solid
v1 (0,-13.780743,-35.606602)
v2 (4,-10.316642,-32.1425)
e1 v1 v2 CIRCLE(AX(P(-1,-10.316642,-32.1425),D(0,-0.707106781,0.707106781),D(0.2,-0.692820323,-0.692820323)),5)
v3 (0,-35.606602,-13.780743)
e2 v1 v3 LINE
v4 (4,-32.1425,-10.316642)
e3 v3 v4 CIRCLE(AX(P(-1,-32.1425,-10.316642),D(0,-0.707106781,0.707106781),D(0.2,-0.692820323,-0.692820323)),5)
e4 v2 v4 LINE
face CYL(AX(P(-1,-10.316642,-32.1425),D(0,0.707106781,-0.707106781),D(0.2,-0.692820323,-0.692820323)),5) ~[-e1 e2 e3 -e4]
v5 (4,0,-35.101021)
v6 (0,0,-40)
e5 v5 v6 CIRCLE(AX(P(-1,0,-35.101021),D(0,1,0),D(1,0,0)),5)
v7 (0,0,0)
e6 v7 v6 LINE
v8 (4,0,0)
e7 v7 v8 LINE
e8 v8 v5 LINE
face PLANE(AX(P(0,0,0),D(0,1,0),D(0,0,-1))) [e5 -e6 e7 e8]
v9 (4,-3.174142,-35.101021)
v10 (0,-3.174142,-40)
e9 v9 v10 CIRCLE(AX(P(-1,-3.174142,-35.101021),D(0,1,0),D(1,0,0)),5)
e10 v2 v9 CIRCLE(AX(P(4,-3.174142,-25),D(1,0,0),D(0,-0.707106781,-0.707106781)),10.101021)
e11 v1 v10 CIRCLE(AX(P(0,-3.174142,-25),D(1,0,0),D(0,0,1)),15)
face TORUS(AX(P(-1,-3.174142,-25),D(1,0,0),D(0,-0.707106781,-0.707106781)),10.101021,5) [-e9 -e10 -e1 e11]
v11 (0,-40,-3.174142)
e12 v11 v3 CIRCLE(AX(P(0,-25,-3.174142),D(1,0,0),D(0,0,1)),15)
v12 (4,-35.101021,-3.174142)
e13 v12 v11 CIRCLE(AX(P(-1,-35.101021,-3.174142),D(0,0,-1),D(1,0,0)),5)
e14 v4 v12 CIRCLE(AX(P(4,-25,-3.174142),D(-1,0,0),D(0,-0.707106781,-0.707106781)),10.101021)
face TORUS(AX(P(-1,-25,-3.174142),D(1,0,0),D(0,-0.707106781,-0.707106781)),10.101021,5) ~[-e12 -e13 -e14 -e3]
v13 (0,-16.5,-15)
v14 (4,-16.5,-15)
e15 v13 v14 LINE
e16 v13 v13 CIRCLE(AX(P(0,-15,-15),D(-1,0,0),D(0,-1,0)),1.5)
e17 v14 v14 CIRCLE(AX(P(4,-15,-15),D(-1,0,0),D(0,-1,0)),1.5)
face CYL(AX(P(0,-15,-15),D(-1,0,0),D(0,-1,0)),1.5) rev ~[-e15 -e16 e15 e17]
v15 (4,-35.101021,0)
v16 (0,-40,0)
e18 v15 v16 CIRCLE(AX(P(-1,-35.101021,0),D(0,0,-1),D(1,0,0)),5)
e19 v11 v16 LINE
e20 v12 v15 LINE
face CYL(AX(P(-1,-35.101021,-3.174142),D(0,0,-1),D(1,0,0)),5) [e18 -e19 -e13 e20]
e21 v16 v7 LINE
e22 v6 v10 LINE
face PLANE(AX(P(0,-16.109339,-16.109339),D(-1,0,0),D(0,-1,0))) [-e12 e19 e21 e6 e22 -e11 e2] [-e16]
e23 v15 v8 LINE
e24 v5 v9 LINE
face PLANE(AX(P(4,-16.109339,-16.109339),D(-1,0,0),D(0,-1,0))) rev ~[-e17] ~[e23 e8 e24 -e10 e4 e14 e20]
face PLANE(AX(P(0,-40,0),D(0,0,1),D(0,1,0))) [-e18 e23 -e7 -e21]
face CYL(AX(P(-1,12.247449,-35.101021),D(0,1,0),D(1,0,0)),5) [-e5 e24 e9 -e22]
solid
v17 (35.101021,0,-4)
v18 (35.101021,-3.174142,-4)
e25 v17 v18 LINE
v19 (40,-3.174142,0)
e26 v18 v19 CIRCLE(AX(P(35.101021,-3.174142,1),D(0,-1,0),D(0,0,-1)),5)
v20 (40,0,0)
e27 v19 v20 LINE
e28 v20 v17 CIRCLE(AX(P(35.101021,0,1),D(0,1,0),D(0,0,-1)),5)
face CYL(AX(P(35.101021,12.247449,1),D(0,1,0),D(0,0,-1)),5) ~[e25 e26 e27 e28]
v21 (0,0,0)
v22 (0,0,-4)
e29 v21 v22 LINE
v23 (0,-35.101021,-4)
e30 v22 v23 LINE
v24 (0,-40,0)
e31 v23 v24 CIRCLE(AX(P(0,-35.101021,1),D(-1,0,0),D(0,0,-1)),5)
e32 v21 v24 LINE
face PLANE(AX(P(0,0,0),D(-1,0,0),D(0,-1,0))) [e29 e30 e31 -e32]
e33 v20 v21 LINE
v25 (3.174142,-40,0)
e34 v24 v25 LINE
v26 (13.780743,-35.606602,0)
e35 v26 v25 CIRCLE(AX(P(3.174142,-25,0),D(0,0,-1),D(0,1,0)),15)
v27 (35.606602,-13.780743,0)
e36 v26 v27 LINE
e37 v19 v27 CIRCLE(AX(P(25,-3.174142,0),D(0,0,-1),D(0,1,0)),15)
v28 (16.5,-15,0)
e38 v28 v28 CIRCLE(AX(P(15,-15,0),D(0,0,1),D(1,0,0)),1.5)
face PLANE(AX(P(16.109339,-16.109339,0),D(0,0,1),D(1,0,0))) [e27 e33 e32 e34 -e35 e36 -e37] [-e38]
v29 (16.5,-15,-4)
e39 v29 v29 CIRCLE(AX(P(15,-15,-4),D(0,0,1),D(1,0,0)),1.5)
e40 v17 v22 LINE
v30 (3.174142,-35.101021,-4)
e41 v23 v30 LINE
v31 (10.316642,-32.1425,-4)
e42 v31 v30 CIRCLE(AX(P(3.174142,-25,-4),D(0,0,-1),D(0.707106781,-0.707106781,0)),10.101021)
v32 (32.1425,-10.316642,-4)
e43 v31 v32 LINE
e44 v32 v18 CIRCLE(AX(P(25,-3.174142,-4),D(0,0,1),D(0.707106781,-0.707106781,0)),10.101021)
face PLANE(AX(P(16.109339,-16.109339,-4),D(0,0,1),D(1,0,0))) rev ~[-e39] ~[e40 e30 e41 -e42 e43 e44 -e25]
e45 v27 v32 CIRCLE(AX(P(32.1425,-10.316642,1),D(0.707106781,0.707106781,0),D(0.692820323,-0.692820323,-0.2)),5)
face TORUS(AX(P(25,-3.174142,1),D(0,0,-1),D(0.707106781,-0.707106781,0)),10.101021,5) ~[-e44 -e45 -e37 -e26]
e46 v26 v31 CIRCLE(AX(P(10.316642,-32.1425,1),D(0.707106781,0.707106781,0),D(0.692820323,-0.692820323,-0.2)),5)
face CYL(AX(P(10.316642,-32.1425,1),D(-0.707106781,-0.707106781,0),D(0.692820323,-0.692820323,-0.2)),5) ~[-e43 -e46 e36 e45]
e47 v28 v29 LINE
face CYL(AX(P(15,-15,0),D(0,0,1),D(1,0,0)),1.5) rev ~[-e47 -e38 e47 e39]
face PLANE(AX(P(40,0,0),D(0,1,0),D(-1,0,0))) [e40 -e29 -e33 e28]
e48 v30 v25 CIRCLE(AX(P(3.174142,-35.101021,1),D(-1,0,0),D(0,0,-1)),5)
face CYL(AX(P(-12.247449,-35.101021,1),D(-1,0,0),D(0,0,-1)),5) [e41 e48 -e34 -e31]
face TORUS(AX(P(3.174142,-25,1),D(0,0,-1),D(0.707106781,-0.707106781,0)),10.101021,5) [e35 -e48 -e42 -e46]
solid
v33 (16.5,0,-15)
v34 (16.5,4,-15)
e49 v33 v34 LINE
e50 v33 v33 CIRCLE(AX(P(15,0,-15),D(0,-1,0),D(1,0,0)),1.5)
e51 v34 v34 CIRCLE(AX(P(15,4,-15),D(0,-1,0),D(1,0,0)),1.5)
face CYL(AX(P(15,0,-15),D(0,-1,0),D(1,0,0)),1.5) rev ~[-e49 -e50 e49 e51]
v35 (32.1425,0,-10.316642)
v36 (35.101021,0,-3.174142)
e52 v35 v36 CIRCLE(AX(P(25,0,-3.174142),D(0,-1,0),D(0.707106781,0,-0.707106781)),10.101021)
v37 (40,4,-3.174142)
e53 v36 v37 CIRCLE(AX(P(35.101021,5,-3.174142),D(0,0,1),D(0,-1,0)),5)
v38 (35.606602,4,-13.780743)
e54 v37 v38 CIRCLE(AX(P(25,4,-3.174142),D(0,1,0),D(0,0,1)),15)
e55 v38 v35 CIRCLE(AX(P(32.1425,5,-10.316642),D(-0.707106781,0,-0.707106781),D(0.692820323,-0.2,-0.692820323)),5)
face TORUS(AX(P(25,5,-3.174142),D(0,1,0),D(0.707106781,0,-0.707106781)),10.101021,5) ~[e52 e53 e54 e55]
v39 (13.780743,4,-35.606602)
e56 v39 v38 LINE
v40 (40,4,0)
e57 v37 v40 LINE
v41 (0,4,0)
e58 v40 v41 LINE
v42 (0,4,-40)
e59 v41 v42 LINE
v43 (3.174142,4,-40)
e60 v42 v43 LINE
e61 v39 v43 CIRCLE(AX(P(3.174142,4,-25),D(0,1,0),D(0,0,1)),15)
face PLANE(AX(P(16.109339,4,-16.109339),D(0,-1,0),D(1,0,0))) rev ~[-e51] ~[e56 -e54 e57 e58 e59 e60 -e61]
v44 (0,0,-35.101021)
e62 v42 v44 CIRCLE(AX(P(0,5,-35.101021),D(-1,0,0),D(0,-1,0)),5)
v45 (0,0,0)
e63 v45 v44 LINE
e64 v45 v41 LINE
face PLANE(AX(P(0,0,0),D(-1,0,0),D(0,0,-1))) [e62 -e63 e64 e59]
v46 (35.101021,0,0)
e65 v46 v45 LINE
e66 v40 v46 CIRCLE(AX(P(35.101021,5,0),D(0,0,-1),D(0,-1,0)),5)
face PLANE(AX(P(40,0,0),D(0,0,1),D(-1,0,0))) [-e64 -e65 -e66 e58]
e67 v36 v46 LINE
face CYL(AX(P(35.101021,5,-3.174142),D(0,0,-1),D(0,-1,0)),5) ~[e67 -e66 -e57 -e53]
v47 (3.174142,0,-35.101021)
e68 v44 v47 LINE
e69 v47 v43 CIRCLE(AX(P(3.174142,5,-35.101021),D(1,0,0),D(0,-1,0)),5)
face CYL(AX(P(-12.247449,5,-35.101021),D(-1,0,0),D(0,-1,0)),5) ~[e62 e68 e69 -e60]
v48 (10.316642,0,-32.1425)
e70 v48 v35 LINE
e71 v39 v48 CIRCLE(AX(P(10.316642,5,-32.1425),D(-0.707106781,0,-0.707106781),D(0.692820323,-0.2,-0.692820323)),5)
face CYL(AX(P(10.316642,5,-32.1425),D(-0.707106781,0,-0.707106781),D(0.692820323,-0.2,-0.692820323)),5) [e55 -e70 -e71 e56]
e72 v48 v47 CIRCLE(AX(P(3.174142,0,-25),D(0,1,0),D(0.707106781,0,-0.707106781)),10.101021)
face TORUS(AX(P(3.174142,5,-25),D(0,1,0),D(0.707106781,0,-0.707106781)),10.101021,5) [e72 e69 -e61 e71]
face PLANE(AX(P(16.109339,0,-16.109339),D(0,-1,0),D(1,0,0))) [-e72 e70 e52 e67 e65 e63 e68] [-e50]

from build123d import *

# Parameters (mm, degrees)
F0_R           = 1.5
F1_DEPTH       = 4
F2_R           = 15
F3_ANGLE       = 90
F4_ANGLE       = 270
F5_T1_DEPTH    = 30.8664248821
F5_T3_DEPTH    = 15.4215903688
F5_T5_DEPTH    = 15.4215903688
F5_T8_ANGLE    = 45
F5_T10_ANGLE   = 45
F5_2_T1_DEPTH  = 30.8664248821
F5_2_T3_DEPTH  = 15.4215903688
F5_2_T5_DEPTH  = 15.4215903688
F5_2_T8_ANGLE  = 45
F5_2_T10_ANGLE = 45
F5_3_T1_DEPTH  = 30.8664248821
F5_3_T3_DEPTH  = 15.4215903688
F5_3_T5_DEPTH  = 15.4215903688
F5_3_T8_ANGLE  = 45
F5_3_T10_ANGLE = 45


# Not quite as in the source:
# - a fillet or chamfer that OpenCascade refuses, or shapes differently, is made with other operations: its cross-section is extruded or revolved along the edge and cut away or added


with BuildPart() as f1:
    # F0 (on Front) → F1 (new body)
    with BuildSketch(Plane.XZ):
        Polygon((40, 0), (0, 0), (0, -40), (9.3873450905, -40), (40, -9.3873450905), align=None)
        with Locations((15, -15)):
            Circle(F0_R, mode=Mode.SUBTRACT)
    extrude(amount=-F1_DEPTH)

    # F2
    f2_edges = [f1.edges().sort_by_distance(p)[0] for p in [
        (9.387345, 2, -40),
        (40, 2, -9.387345),
    ]]
    fillet(f2_edges, radius=F2_R)


with BuildPart() as f3_1:
    # F3: copy of F1
    add(f1.part.rotate(Axis((0, 0, -20), (0, 0, -1)), F3_ANGLE))

    # F5#2: fillet of radius 5 on 1 edges, made by hand

    # F5_2_s2 → F5_2_t1 (cut)
    with BuildSketch(Plane(origin=(0, 10.9129291725, -10.9129291725), x_dir=(1, 0, 0), z_dir=(0, -0.7071067812, 0.7071067812))):
        with BuildLine():
            ThreePointArc((0, -34.9221266183), (2.8729833462, -33.1854247929), (4, -30.0231471327))
            Line((4, -30.0231471327), (4, -34.9221266183))
            Line((4, -34.9221266183), (0, -34.9221266183))
        make_face()
    extrude(amount=F5_2_T1_DEPTH, mode=Mode.SUBTRACT)

    # F5_2_s4 → F5_2_t3 (cut)
    with BuildSketch(Plane.XY.offset(-3.1741416549)):
        with BuildLine():
            ThreePointArc((4, -35.1010205144), (2.8729833462, -38.2632981746), (0, -40))
            Line((0, -40), (4, -40))
            Line((4, -40), (4, -35.1010205144))
        make_face()
    extrude(amount=F5_2_T3_DEPTH, mode=Mode.SUBTRACT)

    # F5_2_s6 → F5_2_t5 (cut)
    with BuildSketch(Plane.XZ.offset(-12.2474487139)):
        with BuildLine():
            ThreePointArc((4, -35.1010205144), (2.8729833462, -38.2632981746), (0, -40))
            Line((0, -40), (4, -40))
            Line((4, -40), (4, -35.1010205144))
        make_face()
    extrude(amount=F5_2_T5_DEPTH, mode=Mode.SUBTRACT)

    # F5_2_s7 → F5_2_t8 (revolve, cut)
    with BuildSketch(Plane(origin=(0, 10.9129291725, -10.9129291725), x_dir=(1, 0, 0), z_dir=(0, -0.7071067812, 0.7071067812))):
        with BuildLine():
            ThreePointArc((0, -34.9221266183), (2.8729833462, -33.1854247929), (4, -30.0231471327))
            Line((4, -30.0231471327), (4, -34.9221266183))
            Line((4, -34.9221266183), (0, -34.9221266183))
        make_face()
    revolve(axis=Axis((4, -3.1741416549, -25), (1, 0, 0)), revolution_arc=F5_2_T8_ANGLE, mode=Mode.SUBTRACT)

    # F5_2_s9 → F5_2_t10 (revolve, cut)
    with BuildSketch(Plane(origin=(0, -10.9129291725, 10.9129291725), x_dir=(1, 0, 0), z_dir=(0, 0.7071067812, -0.7071067812))):
        with BuildLine():
            ThreePointArc((0, 34.9221266183), (2.8729833462, 33.1854247929), (4, 30.0231471327))
            Line((4, 30.0231471327), (4, 34.9221266183))
            Line((4, 34.9221266183), (0, 34.9221266183))
        make_face()
    revolve(axis=Axis((4, -25, -3.1741416549), (-1, 0, 0)), revolution_arc=F5_2_T10_ANGLE, mode=Mode.SUBTRACT)


with BuildPart() as f4_1:
    # F4: copy of F1
    add(f1.part.rotate(Axis((20, 0, 0), (1, 0, 0)), F4_ANGLE))

    # F5#3: fillet of radius 5 on 1 edges, made by hand

    # F5_3_s2 → F5_3_t1 (cut)
    with BuildSketch(Plane(origin=(-10.9129291725, -10.9129291725, 0), x_dir=(0, 0, 1), z_dir=(0.7071067812, 0.7071067812, 0))):
        with BuildLine():
            ThreePointArc((0, 34.9221266183), (-2.8729833462, 33.1854247929), (-4, 30.0231471327))
            Line((-4, 30.0231471327), (-4, 34.9221266183))
            Line((-4, 34.9221266183), (0, 34.9221266183))
        make_face()
    extrude(amount=F5_3_T1_DEPTH, mode=Mode.SUBTRACT)

    # F5_3_s4 → F5_3_t3 (cut)
    with BuildSketch(Plane.XZ.offset(-12.2474487139)):
        with BuildLine():
            ThreePointArc((35.1010205144, -4), (38.2632981746, -2.8729833462), (40, 0))
            Line((40, 0), (40, -4))
            Line((40, -4), (35.1010205144, -4))
        make_face()
    extrude(amount=F5_3_T3_DEPTH, mode=Mode.SUBTRACT)

    # F5_3_s6 → F5_3_t5 (cut)
    with BuildSketch(Plane.YZ.offset(-12.2474487139)):
        with BuildLine():
            ThreePointArc((-35.1010205144, -4), (-38.2632981746, -2.8729833462), (-40, 0))
            Line((-40, 0), (-40, -4))
            Line((-40, -4), (-35.1010205144, -4))
        make_face()
    extrude(amount=F5_3_T5_DEPTH, mode=Mode.SUBTRACT)

    # F5_3_s7 → F5_3_t8 (revolve, cut)
    with BuildSketch(Plane(origin=(-10.9129291725, -10.9129291725, 0), x_dir=(0, 0, 1), z_dir=(0.7071067812, 0.7071067812, 0))):
        with BuildLine():
            ThreePointArc((0, 34.9221266183), (-2.8729833462, 33.1854247929), (-4, 30.0231471327))
            Line((-4, 30.0231471327), (-4, 34.9221266183))
            Line((-4, 34.9221266183), (0, 34.9221266183))
        make_face()
    revolve(axis=Axis((3.1741416549, -25, -4), (0, 0, -1)), revolution_arc=F5_3_T8_ANGLE, mode=Mode.SUBTRACT)

    # F5_3_s9 → F5_3_t10 (revolve, cut)
    with BuildSketch(Plane(origin=(10.9129291725, 10.9129291725, 0), x_dir=(0, 0, 1), z_dir=(-0.7071067812, -0.7071067812, 0))):
        with BuildLine():
            ThreePointArc((0, -34.9221266183), (-2.8729833462, -33.1854247929), (-4, -30.0231471327))
            Line((-4, -30.0231471327), (-4, -34.9221266183))
            Line((-4, -34.9221266183), (0, -34.9221266183))
        make_face()
    revolve(axis=Axis((25, -3.1741416549, -4), (0, 0, 1)), revolution_arc=F5_3_T10_ANGLE, mode=Mode.SUBTRACT)


with BuildPart() as f1_1:
    add(f1.part)

    # F5: fillet of radius 5 on 1 edges, made by hand

    # F5_s2 → F5_t1 (cut)
    with BuildSketch(Plane(origin=(-10.9129291725, 0, -10.9129291725), x_dir=(0, 1, 0), z_dir=(0.7071067812, 0, 0.7071067812))):
        with BuildLine():
            ThreePointArc((4, -34.9221266183), (1.1270166538, -33.1854247929), (0, -30.0231471327))
            Line((0, -30.0231471327), (0, -34.9221266183))
            Line((0, -34.9221266183), (4, -34.9221266183))
        make_face()
    extrude(amount=F5_T1_DEPTH, mode=Mode.SUBTRACT)

    # F5_s4 → F5_t3 (cut)
    with BuildSketch(Plane.XY.offset(-3.1741416549)):
        with BuildLine():
            ThreePointArc((35.1010205144, 0), (38.2632981746, 1.1270166538), (40, 4))
            Line((40, 4), (40, 0))
            Line((40, 0), (35.1010205144, 0))
        make_face()
    extrude(amount=F5_T3_DEPTH, mode=Mode.SUBTRACT)

    # F5_s6 → F5_t5 (cut)
    with BuildSketch(Plane.YZ.offset(-12.2474487139)):
        with BuildLine():
            ThreePointArc((0, -35.1010205144), (1.1270166538, -38.2632981746), (4, -40))
            Line((4, -40), (0, -40))
            Line((0, -40), (0, -35.1010205144))
        make_face()
    extrude(amount=F5_T5_DEPTH, mode=Mode.SUBTRACT)

    # F5_s7 → F5_t8 (revolve, cut)
    with BuildSketch(Plane(origin=(-10.9129291725, 0, -10.9129291725), x_dir=(0, 1, 0), z_dir=(0.7071067812, 0, 0.7071067812))):
        with BuildLine():
            ThreePointArc((0, -30.0231471327), (1.1270166538, -33.1854247929), (4, -34.9221266183))
            Line((4, -34.9221266183), (0, -34.9221266183))
            Line((0, -34.9221266183), (0, -30.0231471327))
        make_face()
    revolve(axis=Axis((3.1741416549, 0, -25), (0, 1, 0)), revolution_arc=F5_T8_ANGLE, mode=Mode.SUBTRACT)

    # F5_s9 → F5_t10 (revolve, cut)
    with BuildSketch(Plane(origin=(10.9129291725, 0, 10.9129291725), x_dir=(0, 1, 0), z_dir=(-0.7071067812, 0, -0.7071067812))):
        with BuildLine():
            ThreePointArc((0, 30.0231471327), (1.1270166538, 33.1854247929), (4, 34.9221266183))
            Line((4, 34.9221266183), (0, 34.9221266183))
            Line((0, 34.9221266183), (0, 30.0231471327))
        make_face()
    revolve(axis=Axis((25, 0, -3.1741416549), (0, -1, 0)), revolution_arc=F5_T10_ANGLE, mode=Mode.SUBTRACT)


solid = Compound([f3_1.part, f4_1.part, f1_1.part])
